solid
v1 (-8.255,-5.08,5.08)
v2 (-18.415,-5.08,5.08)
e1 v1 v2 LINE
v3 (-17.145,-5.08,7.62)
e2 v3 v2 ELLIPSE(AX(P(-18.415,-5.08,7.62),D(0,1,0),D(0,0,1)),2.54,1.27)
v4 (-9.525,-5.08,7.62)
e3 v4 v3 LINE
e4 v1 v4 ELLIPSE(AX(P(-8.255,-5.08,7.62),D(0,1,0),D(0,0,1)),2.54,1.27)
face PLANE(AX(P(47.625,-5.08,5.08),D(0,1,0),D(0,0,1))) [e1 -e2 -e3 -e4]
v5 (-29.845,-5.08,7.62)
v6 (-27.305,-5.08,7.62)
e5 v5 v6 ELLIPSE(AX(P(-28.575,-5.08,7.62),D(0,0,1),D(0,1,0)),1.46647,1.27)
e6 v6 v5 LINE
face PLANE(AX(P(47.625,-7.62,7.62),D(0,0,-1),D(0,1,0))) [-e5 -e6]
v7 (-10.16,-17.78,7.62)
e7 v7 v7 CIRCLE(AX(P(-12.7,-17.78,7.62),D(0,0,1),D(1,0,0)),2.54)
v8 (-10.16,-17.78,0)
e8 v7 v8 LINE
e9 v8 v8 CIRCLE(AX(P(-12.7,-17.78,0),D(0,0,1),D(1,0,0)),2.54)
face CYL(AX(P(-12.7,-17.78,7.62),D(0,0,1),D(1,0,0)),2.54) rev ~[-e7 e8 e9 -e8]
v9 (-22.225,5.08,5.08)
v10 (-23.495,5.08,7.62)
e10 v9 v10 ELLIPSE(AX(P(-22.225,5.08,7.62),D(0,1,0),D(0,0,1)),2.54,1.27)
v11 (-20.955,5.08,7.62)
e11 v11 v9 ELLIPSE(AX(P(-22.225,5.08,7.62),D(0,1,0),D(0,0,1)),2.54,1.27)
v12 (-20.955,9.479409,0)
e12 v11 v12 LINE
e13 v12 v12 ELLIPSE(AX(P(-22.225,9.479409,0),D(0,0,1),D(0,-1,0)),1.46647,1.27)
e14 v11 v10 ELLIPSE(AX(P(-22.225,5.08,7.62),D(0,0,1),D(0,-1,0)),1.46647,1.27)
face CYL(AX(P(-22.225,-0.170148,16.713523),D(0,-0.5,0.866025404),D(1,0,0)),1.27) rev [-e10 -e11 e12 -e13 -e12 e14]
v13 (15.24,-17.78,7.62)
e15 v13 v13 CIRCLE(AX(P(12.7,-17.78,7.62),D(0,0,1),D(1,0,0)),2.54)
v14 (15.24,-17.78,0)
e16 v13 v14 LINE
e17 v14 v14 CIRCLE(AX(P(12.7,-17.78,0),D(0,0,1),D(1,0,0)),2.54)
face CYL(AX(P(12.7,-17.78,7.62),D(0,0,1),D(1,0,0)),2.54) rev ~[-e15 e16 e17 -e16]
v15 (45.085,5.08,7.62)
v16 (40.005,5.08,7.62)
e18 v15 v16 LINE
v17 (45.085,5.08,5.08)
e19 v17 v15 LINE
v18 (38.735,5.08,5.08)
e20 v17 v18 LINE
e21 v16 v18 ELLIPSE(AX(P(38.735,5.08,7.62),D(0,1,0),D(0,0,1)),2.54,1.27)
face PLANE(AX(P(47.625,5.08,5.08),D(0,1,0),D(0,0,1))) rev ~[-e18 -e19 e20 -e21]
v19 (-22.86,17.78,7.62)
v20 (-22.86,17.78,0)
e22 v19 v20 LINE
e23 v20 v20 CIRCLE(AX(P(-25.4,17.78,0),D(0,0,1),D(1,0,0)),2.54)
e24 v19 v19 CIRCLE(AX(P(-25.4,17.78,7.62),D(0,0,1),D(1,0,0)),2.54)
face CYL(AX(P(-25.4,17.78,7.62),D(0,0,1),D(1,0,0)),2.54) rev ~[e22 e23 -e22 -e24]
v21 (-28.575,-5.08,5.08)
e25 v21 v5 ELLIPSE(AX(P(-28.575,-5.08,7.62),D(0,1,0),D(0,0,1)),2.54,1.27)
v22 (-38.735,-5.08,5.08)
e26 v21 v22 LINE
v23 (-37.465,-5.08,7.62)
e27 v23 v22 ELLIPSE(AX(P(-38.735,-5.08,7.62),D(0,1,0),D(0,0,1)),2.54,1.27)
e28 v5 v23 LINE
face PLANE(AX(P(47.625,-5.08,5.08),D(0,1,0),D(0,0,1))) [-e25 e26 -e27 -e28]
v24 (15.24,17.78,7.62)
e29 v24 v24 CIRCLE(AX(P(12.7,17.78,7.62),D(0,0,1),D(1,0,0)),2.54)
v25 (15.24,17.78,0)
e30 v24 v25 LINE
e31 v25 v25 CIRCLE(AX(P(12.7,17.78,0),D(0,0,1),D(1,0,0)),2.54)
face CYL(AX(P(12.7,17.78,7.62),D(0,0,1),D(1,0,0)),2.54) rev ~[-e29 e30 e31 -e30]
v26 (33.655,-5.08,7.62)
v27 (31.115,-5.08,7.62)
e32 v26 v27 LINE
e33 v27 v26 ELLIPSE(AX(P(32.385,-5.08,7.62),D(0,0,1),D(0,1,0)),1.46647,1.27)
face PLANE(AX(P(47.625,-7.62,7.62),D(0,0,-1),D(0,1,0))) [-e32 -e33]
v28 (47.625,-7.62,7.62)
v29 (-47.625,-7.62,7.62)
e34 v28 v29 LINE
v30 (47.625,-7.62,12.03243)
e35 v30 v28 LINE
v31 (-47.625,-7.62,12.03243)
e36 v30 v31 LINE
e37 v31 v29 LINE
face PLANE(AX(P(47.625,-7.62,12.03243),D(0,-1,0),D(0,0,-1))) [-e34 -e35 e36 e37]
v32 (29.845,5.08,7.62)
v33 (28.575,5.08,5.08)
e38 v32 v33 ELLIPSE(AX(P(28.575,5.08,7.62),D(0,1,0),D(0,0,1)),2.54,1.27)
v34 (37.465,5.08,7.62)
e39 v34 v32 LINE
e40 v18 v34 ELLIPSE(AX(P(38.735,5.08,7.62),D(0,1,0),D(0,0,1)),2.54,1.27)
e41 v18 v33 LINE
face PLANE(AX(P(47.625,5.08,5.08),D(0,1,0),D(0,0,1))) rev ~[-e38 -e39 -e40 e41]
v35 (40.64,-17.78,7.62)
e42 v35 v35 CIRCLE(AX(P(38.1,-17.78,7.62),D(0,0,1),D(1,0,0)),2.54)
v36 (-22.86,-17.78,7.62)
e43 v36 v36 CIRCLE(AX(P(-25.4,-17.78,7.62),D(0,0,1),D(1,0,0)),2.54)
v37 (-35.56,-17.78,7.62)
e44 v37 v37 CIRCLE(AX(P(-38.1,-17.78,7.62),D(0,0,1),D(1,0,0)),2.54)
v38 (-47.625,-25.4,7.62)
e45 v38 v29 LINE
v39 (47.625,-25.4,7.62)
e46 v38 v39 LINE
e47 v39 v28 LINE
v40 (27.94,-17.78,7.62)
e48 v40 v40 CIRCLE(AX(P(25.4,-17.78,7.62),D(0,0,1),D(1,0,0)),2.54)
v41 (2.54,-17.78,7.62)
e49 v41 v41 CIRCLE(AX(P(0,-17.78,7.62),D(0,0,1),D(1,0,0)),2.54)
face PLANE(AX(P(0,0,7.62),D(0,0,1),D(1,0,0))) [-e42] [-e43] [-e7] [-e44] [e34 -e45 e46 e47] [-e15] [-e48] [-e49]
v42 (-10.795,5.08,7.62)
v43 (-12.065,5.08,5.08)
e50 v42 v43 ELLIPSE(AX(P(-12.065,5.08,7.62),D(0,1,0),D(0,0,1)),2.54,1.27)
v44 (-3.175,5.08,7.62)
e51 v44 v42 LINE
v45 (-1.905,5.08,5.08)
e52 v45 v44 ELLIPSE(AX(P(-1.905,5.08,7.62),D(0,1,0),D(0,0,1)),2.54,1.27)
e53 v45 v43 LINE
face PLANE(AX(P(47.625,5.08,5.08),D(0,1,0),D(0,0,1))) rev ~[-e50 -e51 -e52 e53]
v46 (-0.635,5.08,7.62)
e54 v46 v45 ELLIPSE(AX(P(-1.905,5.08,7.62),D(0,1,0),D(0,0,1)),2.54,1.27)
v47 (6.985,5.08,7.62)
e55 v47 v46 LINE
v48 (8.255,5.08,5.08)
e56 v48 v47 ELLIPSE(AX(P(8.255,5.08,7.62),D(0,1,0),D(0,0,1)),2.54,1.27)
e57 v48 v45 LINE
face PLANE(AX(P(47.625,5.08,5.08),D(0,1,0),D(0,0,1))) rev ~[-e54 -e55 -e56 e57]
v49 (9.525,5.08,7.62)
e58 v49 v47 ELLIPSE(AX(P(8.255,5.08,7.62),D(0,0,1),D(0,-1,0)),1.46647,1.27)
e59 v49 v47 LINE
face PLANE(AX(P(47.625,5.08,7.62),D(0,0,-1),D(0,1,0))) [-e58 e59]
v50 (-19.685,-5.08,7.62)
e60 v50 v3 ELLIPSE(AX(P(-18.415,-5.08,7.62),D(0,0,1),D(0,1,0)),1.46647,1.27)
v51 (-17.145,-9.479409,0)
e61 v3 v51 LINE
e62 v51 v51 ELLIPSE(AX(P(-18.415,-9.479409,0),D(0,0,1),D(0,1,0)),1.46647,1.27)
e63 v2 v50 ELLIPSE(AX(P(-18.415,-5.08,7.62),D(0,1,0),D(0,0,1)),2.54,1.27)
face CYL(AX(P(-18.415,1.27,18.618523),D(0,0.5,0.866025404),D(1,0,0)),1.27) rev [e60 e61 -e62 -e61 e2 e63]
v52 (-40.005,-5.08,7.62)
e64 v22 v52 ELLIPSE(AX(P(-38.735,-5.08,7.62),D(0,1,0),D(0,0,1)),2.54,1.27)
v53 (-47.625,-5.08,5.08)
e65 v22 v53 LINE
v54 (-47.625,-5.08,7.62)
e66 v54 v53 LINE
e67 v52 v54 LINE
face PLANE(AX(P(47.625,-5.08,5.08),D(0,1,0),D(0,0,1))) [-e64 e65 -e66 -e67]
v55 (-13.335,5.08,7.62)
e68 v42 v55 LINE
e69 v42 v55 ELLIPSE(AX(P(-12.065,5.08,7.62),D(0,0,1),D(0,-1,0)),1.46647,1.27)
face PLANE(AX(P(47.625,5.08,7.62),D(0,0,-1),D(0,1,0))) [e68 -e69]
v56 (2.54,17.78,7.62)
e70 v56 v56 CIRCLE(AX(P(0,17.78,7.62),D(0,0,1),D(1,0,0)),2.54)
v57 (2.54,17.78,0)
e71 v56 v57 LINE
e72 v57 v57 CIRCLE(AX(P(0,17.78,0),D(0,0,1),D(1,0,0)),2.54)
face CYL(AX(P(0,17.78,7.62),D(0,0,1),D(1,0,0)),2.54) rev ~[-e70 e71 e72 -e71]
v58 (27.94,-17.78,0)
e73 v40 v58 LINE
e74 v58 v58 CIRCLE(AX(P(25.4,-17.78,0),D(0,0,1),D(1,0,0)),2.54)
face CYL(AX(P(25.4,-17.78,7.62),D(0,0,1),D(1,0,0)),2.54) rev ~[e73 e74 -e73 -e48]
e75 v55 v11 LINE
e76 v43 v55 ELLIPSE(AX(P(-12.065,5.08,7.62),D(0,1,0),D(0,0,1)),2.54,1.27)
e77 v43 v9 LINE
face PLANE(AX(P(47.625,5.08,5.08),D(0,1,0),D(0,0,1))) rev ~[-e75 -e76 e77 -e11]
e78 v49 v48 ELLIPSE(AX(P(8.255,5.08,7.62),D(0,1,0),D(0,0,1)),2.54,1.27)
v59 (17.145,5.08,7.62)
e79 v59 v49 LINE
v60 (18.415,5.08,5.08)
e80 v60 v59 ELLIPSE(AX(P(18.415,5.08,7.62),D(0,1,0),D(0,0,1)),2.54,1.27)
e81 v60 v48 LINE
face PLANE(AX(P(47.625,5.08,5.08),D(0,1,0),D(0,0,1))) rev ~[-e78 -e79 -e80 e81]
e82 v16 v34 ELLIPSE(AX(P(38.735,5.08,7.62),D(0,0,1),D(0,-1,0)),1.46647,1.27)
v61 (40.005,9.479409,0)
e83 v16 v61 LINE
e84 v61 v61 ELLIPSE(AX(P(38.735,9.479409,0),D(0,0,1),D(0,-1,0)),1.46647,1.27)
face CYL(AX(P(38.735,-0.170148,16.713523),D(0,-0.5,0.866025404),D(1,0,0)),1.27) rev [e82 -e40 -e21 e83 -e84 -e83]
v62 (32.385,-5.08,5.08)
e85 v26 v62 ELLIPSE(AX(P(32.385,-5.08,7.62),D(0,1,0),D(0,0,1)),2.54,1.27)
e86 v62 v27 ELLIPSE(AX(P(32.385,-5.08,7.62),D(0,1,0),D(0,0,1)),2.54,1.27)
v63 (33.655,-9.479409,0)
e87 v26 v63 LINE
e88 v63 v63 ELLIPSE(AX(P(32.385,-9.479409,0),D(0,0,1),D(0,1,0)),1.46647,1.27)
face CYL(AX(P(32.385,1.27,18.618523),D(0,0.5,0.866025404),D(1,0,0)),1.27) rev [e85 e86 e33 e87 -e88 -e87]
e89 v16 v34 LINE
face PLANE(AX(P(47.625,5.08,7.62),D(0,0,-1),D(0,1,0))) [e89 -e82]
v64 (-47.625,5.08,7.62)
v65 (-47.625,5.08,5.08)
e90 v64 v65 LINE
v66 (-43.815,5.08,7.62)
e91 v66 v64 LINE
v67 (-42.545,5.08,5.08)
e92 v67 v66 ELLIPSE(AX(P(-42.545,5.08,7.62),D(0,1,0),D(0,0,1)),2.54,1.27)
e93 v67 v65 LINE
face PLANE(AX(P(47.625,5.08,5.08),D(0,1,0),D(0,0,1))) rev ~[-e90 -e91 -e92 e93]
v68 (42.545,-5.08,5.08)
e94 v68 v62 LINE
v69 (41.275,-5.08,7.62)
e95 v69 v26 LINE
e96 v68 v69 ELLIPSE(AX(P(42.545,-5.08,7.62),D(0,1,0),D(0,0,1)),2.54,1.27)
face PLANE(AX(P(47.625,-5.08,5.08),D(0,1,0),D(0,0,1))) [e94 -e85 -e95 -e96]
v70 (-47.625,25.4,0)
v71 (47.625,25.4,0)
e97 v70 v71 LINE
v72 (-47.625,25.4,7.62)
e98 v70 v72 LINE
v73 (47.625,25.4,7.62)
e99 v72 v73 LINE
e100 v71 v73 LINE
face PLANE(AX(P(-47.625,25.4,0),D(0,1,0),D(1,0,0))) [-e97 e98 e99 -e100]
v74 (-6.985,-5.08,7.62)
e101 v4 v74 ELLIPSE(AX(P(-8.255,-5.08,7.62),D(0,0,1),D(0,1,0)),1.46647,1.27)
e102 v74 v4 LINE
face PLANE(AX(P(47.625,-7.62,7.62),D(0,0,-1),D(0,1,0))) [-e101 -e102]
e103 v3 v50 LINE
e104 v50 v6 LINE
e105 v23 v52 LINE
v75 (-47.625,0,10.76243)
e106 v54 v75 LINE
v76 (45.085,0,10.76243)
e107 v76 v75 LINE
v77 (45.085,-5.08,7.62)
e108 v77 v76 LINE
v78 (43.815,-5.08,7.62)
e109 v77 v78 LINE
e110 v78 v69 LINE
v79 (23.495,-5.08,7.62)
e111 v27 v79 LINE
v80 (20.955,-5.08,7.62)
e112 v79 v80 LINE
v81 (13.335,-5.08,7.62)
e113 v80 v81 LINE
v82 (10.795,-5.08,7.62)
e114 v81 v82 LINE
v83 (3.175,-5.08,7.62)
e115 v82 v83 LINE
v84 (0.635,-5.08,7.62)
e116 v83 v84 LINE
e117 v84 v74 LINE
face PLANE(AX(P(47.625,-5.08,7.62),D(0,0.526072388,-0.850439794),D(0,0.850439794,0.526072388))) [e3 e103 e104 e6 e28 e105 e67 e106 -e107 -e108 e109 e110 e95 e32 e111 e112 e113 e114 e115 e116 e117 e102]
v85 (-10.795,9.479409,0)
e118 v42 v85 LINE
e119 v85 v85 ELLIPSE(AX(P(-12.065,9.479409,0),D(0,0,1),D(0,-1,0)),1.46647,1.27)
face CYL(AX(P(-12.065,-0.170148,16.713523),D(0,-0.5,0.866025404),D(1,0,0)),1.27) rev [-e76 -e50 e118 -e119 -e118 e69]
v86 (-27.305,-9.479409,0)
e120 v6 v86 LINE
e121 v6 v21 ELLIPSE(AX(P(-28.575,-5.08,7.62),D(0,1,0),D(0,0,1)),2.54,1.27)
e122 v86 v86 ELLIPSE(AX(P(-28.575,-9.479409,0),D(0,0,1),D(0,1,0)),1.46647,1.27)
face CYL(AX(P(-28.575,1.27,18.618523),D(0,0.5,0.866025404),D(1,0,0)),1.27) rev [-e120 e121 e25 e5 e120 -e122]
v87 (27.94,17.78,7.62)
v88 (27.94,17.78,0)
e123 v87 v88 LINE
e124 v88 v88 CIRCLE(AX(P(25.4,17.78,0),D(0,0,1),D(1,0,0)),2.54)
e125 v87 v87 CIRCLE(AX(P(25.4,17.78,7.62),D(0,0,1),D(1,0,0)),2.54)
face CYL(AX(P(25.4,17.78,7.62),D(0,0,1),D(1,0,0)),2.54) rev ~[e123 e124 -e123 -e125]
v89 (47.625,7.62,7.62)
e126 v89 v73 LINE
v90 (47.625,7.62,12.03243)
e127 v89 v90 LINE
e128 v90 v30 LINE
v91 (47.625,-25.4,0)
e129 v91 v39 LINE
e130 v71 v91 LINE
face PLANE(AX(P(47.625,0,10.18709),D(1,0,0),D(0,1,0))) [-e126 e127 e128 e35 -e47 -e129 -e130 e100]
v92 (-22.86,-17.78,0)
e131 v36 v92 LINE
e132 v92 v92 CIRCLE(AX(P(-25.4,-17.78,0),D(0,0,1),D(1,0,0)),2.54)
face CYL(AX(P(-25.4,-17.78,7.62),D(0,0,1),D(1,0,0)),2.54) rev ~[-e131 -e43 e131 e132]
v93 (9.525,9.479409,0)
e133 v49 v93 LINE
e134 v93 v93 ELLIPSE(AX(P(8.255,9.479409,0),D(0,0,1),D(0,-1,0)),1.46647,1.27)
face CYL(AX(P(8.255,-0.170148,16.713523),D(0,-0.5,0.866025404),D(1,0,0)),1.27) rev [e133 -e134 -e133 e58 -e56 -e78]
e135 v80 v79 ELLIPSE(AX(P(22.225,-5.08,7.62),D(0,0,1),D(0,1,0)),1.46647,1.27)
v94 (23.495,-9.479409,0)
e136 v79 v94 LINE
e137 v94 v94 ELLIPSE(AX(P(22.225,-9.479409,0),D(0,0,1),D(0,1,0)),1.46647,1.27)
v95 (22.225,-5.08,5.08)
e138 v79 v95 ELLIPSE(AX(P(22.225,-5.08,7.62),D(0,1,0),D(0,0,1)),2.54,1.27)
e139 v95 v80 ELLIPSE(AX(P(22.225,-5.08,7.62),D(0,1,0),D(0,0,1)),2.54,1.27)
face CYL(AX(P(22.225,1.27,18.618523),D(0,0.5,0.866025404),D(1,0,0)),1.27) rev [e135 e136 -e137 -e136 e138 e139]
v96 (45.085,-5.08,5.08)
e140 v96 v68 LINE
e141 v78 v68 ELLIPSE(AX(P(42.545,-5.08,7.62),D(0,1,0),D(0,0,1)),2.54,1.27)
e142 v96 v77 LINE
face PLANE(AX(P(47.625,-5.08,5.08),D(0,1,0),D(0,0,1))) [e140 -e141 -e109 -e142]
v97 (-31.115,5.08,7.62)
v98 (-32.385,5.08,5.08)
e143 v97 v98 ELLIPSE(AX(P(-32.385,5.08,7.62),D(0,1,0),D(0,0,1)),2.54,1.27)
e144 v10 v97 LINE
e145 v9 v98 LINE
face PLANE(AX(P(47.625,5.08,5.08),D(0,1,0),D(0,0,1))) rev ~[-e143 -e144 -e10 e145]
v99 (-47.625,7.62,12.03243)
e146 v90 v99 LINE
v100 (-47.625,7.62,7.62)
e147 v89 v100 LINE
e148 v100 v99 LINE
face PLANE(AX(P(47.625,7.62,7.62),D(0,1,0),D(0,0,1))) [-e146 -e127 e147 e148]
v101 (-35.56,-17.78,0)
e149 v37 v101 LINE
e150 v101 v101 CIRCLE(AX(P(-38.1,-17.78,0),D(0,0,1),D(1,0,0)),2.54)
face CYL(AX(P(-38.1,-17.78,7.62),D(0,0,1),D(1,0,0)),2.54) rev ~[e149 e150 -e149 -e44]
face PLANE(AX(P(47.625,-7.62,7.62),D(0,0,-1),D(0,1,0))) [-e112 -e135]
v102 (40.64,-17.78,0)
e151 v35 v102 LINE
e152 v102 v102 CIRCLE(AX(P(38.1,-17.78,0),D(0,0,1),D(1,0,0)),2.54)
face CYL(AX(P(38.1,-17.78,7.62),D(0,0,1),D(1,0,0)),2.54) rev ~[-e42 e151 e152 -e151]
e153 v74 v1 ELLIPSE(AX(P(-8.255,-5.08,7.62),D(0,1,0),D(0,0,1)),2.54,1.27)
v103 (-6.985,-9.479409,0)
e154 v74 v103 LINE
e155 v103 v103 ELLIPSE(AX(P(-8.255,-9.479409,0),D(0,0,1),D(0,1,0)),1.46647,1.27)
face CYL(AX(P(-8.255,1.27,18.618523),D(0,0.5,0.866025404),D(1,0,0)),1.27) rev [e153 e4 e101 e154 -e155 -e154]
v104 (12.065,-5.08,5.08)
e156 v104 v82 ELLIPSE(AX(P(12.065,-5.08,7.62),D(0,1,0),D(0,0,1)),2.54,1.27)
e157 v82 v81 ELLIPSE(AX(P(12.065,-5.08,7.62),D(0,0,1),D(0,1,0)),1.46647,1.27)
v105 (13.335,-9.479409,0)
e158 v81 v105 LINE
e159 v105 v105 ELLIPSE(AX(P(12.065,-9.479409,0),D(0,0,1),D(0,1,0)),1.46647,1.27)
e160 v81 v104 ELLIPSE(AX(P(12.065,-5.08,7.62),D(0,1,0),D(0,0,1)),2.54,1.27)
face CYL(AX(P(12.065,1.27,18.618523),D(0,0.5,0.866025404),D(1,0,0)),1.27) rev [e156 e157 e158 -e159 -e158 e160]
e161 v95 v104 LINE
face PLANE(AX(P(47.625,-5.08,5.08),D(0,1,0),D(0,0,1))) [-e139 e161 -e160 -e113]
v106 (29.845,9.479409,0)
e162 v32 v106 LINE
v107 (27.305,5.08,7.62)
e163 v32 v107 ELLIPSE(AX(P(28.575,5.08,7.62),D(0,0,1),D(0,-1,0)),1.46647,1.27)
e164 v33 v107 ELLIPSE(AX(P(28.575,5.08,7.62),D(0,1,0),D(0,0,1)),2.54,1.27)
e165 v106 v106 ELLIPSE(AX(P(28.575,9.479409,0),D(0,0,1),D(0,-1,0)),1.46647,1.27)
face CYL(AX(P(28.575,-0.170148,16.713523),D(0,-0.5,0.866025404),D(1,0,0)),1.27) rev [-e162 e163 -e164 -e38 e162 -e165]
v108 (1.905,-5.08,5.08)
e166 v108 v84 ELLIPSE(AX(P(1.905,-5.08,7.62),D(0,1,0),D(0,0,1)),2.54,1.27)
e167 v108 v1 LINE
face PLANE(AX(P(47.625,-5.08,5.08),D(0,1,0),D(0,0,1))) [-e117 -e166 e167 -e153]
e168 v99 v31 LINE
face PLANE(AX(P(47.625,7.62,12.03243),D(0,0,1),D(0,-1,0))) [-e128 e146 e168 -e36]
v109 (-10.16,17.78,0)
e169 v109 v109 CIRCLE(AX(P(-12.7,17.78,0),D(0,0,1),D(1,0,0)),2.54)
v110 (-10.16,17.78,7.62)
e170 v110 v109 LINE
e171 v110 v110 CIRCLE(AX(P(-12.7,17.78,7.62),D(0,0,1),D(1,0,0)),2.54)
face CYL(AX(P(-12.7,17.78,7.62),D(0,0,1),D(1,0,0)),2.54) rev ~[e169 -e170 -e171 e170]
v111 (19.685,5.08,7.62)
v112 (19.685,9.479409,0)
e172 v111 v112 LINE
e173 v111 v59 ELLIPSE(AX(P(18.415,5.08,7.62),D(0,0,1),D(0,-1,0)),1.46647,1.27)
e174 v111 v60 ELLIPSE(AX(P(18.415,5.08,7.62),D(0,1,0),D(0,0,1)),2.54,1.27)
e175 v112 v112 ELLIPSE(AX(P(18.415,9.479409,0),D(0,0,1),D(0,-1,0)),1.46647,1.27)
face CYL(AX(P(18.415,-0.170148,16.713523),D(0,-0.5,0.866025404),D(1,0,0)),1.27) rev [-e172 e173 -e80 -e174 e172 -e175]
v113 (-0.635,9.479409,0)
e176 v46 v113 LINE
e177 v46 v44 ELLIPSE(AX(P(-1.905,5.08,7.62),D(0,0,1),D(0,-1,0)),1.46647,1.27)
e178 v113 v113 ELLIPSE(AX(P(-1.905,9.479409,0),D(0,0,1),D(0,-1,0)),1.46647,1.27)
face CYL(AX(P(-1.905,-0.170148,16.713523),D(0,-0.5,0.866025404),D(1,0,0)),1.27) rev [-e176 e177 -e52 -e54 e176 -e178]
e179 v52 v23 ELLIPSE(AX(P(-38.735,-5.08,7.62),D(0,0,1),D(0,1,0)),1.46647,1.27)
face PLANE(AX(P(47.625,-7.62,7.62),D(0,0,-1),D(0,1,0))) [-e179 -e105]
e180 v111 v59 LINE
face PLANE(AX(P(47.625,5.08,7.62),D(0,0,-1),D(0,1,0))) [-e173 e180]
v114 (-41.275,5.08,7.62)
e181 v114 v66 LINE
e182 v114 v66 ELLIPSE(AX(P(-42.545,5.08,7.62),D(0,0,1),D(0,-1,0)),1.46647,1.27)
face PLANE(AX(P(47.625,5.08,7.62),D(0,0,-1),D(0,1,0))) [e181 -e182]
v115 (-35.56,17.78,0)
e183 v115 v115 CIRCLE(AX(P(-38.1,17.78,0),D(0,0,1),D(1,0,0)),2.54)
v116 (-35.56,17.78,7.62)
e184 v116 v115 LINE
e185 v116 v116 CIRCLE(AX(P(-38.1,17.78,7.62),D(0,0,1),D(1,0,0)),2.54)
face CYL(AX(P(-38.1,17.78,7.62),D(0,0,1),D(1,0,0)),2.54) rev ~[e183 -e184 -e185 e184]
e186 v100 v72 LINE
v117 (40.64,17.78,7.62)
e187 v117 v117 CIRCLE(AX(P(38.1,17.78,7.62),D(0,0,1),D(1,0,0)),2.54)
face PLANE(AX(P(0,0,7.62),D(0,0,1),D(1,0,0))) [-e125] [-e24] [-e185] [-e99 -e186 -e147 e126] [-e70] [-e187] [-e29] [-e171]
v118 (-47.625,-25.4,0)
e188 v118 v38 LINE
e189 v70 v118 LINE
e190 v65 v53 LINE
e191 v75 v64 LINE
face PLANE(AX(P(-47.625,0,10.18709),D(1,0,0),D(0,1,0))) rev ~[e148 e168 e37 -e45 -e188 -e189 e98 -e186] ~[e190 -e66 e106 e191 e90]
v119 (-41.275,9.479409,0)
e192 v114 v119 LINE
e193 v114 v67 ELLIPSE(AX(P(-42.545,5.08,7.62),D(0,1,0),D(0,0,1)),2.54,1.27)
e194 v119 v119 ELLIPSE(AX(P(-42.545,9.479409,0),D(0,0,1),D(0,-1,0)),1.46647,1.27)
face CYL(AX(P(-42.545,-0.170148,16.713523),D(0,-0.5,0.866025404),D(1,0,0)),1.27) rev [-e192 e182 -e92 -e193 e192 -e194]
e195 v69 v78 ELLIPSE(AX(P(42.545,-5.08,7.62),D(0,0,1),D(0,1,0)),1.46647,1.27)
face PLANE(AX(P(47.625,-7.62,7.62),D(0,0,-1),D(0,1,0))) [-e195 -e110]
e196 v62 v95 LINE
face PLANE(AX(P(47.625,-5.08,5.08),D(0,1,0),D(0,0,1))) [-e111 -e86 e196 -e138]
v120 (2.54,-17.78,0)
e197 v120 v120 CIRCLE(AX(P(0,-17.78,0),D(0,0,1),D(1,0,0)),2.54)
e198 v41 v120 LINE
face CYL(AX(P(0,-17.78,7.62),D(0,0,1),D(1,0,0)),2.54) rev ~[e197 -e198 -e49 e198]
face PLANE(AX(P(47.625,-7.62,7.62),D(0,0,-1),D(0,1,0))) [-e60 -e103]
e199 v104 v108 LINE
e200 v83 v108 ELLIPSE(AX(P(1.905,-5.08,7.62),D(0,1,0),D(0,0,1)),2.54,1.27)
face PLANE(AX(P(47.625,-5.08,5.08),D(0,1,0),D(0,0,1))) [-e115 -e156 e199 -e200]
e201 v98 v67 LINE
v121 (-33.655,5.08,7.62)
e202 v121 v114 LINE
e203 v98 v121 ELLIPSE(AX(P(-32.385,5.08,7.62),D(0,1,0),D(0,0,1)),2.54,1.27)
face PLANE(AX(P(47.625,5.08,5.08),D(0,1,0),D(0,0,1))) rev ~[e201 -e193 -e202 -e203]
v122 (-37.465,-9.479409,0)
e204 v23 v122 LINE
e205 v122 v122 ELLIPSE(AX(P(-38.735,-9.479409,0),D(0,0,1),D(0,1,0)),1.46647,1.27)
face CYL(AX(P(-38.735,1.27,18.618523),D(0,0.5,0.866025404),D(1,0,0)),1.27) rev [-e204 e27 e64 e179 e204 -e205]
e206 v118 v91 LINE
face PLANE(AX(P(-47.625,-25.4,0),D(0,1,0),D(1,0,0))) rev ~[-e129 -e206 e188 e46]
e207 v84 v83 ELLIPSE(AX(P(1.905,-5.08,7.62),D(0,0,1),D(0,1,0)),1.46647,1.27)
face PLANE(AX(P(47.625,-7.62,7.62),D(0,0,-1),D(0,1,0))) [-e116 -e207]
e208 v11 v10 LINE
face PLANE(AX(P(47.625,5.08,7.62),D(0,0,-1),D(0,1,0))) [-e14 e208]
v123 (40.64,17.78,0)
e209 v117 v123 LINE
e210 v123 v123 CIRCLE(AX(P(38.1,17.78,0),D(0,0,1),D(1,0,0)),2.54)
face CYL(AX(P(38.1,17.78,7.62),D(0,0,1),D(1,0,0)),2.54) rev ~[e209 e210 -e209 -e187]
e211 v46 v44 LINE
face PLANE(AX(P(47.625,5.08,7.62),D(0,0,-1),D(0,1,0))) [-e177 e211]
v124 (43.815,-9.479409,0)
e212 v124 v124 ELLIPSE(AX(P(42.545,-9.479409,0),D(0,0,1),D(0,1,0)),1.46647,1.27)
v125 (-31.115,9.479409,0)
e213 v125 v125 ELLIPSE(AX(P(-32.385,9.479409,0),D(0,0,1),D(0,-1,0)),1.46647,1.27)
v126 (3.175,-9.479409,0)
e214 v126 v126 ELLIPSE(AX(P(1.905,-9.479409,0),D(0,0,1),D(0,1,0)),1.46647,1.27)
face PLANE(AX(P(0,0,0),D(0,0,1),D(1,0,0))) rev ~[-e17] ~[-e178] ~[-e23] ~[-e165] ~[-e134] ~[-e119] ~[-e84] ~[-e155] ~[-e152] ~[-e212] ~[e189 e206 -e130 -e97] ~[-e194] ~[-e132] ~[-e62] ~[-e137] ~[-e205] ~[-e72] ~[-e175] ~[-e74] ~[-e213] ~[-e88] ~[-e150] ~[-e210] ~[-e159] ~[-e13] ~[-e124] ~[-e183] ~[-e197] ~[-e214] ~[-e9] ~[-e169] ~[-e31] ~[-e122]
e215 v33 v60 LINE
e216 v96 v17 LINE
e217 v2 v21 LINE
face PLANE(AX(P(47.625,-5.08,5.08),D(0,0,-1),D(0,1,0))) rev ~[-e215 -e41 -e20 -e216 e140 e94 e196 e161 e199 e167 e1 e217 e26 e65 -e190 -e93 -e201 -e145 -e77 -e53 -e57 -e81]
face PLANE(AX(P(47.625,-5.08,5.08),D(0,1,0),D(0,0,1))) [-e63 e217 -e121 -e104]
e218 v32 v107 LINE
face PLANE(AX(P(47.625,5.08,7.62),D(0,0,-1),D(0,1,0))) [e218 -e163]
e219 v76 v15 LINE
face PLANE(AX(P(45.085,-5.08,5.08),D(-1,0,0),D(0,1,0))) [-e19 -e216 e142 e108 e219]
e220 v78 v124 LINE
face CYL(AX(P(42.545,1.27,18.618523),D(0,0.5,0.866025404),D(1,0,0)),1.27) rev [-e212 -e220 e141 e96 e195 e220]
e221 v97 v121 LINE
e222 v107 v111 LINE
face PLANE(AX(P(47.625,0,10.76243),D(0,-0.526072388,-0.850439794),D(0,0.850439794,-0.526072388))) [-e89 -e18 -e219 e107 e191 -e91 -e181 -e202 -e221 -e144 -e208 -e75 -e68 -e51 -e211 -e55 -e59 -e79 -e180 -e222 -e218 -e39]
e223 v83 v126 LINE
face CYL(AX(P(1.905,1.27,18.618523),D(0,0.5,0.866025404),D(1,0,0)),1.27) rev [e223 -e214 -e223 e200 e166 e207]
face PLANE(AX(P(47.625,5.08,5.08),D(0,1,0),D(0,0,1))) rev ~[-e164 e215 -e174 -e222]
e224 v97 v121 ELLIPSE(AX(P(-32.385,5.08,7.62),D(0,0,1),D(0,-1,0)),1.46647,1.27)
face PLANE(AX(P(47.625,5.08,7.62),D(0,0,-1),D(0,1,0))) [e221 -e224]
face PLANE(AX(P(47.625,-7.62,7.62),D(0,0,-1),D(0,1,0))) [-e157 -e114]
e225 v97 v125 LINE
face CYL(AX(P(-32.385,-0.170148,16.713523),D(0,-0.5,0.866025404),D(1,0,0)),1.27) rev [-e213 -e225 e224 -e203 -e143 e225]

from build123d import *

# Parameters (mm, degrees)
F0_W      = 95.25
F0_H      = 50.8
F1_DEPTH  = 7.62
F2_R      = 2.54
F3_DEPTH  = 7.621
F4_W      = 10.16
F4_H      = 5.08
F5_DEPTH  = 95.251
F8_R      = 1.27
F9_DEPTH  = 27.2604090512
F12_R     = 1.27
F13_DEPTH = 29.4601135768
F15_DEPTH = 95.25
F16_W     = 2.54
F16_H     = 10.16


with BuildPart() as f1:
    # F0 (on Top) → F1 (new body)
    with BuildSketch(Plane.XY):
        Rectangle(F0_W, F0_H)
    extrude(amount=F1_DEPTH)

    # F2 (on face) → F3 (cut, through all)
    with BuildSketch(Plane.XY.offset(7.62)):
        with Locations((-38.1, 17.78)):
            Circle(F2_R)
        with Locations((-38.1, -17.78)):
            Circle(F2_R)
        with Locations((-25.4, 17.78)):
            Circle(F2_R)
        with Locations((-25.4, -17.78)):
            Circle(F2_R)
        with Locations((-12.7, 17.78)):
            Circle(F2_R)
        with Locations((-12.7, -17.78)):
            Circle(F2_R)
        with Locations((0, 17.78)):
            Circle(F2_R)
        with Locations((0, -17.78)):
            Circle(F2_R)
        with Locations((12.7, 17.78)):
            Circle(F2_R)
        with Locations((12.7, -17.78)):
            Circle(F2_R)
        with Locations((25.4, 17.78)):
            Circle(F2_R)
        with Locations((25.4, -17.78)):
            Circle(F2_R)
        with Locations((38.1, 17.78)):
            Circle(F2_R)
        with Locations((38.1, -17.78)):
            Circle(F2_R)
    extrude(amount=-F3_DEPTH, mode=Mode.SUBTRACT)

    # F4 (on face) → F5 (cut, through all)
    with BuildSketch(Plane.YZ.offset(47.625)):
        with Locations((0, 7.62)):
            Rectangle(F4_W, F4_H)
    extrude(amount=-F5_DEPTH, mode=Mode.SUBTRACT)

    # F8 (on face) → F9 (cut, through all)
    with BuildSketch(Plane(origin=(0, -7.2797045256, 12.6088181024), x_dir=(1, 0, 0), z_dir=(0, 0.5, -0.8660254038))):
        with Locations((-42.545, -8.2094090512)):
            Circle(F8_R)
        with Locations((-32.385, -8.2094090512)):
            Circle(F8_R)
        with Locations((-22.225, -8.2094090512)):
            Circle(F8_R)
        with Locations((-12.065, -8.2094090512)):
            Circle(F8_R)
        with Locations((-1.905, -8.2094090512)):
            Circle(F8_R)
        with Locations((8.255, -8.2094090512)):
            Circle(F8_R)
        with Locations((18.415, -8.2094090512)):
            Circle(F8_R)
        with Locations((28.575, -8.2094090512)):
            Circle(F8_R)
        with Locations((38.735, -8.2094090512)):
            Circle(F8_R)
        with Locations((48.895, -8.2094090512)):
            Circle(F8_R)
    extrude(amount=F9_DEPTH, mode=Mode.SUBTRACT)

    # F12 (on face) → F13 (cut, through all)
    with BuildSketch(Plane(origin=(0, 8.3795567884, 14.5138181024), x_dir=(1, 0, 0), z_dir=(0, -0.5, -0.8660254038))):
        with Locations((42.545, 8.2094090512)):
            Circle(F12_R)
        with Locations((32.385, 8.2094090512)):
            Circle(F12_R)
        with Locations((22.225, 8.2094090512)):
            Circle(F12_R)
        with Locations((12.065, 8.2094090512)):
            Circle(F12_R)
        with Locations((1.905, 8.2094090512)):
            Circle(F12_R)
        with Locations((-8.255, 8.2094090512)):
            Circle(F12_R)
        with Locations((-18.415, 8.2094090512)):
            Circle(F12_R)
        with Locations((-28.575, 8.2094090512)):
            Circle(F12_R)
        with Locations((-38.735, 8.2094090512)):
            Circle(F12_R)
        with Locations((-48.895, 8.2094090512)):
            Circle(F12_R)
    extrude(amount=F13_DEPTH, mode=Mode.SUBTRACT)

    # F14 (on face) → F15 (join, through all)
    with BuildSketch(Plane.YZ.offset(47.625)):
        Polygon((-7.62, 12.0324302436), (-7.62, 7.62), (-5.08, 7.62), (0, 10.7624302436), (5.08, 7.62), (7.62, 7.62), (7.62, 12.0324302436), align=None)
    extrude(amount=-F15_DEPTH)

    # F16 (on face) → F17 (join, up to the next surface of F1)
    with BuildSketch(Plane.XY.offset(5.08)):
        with Locations((46.355, 0)):
            Rectangle(F16_W, F16_H)
    extrude(until=Until.NEXT)


solid = f1.part
